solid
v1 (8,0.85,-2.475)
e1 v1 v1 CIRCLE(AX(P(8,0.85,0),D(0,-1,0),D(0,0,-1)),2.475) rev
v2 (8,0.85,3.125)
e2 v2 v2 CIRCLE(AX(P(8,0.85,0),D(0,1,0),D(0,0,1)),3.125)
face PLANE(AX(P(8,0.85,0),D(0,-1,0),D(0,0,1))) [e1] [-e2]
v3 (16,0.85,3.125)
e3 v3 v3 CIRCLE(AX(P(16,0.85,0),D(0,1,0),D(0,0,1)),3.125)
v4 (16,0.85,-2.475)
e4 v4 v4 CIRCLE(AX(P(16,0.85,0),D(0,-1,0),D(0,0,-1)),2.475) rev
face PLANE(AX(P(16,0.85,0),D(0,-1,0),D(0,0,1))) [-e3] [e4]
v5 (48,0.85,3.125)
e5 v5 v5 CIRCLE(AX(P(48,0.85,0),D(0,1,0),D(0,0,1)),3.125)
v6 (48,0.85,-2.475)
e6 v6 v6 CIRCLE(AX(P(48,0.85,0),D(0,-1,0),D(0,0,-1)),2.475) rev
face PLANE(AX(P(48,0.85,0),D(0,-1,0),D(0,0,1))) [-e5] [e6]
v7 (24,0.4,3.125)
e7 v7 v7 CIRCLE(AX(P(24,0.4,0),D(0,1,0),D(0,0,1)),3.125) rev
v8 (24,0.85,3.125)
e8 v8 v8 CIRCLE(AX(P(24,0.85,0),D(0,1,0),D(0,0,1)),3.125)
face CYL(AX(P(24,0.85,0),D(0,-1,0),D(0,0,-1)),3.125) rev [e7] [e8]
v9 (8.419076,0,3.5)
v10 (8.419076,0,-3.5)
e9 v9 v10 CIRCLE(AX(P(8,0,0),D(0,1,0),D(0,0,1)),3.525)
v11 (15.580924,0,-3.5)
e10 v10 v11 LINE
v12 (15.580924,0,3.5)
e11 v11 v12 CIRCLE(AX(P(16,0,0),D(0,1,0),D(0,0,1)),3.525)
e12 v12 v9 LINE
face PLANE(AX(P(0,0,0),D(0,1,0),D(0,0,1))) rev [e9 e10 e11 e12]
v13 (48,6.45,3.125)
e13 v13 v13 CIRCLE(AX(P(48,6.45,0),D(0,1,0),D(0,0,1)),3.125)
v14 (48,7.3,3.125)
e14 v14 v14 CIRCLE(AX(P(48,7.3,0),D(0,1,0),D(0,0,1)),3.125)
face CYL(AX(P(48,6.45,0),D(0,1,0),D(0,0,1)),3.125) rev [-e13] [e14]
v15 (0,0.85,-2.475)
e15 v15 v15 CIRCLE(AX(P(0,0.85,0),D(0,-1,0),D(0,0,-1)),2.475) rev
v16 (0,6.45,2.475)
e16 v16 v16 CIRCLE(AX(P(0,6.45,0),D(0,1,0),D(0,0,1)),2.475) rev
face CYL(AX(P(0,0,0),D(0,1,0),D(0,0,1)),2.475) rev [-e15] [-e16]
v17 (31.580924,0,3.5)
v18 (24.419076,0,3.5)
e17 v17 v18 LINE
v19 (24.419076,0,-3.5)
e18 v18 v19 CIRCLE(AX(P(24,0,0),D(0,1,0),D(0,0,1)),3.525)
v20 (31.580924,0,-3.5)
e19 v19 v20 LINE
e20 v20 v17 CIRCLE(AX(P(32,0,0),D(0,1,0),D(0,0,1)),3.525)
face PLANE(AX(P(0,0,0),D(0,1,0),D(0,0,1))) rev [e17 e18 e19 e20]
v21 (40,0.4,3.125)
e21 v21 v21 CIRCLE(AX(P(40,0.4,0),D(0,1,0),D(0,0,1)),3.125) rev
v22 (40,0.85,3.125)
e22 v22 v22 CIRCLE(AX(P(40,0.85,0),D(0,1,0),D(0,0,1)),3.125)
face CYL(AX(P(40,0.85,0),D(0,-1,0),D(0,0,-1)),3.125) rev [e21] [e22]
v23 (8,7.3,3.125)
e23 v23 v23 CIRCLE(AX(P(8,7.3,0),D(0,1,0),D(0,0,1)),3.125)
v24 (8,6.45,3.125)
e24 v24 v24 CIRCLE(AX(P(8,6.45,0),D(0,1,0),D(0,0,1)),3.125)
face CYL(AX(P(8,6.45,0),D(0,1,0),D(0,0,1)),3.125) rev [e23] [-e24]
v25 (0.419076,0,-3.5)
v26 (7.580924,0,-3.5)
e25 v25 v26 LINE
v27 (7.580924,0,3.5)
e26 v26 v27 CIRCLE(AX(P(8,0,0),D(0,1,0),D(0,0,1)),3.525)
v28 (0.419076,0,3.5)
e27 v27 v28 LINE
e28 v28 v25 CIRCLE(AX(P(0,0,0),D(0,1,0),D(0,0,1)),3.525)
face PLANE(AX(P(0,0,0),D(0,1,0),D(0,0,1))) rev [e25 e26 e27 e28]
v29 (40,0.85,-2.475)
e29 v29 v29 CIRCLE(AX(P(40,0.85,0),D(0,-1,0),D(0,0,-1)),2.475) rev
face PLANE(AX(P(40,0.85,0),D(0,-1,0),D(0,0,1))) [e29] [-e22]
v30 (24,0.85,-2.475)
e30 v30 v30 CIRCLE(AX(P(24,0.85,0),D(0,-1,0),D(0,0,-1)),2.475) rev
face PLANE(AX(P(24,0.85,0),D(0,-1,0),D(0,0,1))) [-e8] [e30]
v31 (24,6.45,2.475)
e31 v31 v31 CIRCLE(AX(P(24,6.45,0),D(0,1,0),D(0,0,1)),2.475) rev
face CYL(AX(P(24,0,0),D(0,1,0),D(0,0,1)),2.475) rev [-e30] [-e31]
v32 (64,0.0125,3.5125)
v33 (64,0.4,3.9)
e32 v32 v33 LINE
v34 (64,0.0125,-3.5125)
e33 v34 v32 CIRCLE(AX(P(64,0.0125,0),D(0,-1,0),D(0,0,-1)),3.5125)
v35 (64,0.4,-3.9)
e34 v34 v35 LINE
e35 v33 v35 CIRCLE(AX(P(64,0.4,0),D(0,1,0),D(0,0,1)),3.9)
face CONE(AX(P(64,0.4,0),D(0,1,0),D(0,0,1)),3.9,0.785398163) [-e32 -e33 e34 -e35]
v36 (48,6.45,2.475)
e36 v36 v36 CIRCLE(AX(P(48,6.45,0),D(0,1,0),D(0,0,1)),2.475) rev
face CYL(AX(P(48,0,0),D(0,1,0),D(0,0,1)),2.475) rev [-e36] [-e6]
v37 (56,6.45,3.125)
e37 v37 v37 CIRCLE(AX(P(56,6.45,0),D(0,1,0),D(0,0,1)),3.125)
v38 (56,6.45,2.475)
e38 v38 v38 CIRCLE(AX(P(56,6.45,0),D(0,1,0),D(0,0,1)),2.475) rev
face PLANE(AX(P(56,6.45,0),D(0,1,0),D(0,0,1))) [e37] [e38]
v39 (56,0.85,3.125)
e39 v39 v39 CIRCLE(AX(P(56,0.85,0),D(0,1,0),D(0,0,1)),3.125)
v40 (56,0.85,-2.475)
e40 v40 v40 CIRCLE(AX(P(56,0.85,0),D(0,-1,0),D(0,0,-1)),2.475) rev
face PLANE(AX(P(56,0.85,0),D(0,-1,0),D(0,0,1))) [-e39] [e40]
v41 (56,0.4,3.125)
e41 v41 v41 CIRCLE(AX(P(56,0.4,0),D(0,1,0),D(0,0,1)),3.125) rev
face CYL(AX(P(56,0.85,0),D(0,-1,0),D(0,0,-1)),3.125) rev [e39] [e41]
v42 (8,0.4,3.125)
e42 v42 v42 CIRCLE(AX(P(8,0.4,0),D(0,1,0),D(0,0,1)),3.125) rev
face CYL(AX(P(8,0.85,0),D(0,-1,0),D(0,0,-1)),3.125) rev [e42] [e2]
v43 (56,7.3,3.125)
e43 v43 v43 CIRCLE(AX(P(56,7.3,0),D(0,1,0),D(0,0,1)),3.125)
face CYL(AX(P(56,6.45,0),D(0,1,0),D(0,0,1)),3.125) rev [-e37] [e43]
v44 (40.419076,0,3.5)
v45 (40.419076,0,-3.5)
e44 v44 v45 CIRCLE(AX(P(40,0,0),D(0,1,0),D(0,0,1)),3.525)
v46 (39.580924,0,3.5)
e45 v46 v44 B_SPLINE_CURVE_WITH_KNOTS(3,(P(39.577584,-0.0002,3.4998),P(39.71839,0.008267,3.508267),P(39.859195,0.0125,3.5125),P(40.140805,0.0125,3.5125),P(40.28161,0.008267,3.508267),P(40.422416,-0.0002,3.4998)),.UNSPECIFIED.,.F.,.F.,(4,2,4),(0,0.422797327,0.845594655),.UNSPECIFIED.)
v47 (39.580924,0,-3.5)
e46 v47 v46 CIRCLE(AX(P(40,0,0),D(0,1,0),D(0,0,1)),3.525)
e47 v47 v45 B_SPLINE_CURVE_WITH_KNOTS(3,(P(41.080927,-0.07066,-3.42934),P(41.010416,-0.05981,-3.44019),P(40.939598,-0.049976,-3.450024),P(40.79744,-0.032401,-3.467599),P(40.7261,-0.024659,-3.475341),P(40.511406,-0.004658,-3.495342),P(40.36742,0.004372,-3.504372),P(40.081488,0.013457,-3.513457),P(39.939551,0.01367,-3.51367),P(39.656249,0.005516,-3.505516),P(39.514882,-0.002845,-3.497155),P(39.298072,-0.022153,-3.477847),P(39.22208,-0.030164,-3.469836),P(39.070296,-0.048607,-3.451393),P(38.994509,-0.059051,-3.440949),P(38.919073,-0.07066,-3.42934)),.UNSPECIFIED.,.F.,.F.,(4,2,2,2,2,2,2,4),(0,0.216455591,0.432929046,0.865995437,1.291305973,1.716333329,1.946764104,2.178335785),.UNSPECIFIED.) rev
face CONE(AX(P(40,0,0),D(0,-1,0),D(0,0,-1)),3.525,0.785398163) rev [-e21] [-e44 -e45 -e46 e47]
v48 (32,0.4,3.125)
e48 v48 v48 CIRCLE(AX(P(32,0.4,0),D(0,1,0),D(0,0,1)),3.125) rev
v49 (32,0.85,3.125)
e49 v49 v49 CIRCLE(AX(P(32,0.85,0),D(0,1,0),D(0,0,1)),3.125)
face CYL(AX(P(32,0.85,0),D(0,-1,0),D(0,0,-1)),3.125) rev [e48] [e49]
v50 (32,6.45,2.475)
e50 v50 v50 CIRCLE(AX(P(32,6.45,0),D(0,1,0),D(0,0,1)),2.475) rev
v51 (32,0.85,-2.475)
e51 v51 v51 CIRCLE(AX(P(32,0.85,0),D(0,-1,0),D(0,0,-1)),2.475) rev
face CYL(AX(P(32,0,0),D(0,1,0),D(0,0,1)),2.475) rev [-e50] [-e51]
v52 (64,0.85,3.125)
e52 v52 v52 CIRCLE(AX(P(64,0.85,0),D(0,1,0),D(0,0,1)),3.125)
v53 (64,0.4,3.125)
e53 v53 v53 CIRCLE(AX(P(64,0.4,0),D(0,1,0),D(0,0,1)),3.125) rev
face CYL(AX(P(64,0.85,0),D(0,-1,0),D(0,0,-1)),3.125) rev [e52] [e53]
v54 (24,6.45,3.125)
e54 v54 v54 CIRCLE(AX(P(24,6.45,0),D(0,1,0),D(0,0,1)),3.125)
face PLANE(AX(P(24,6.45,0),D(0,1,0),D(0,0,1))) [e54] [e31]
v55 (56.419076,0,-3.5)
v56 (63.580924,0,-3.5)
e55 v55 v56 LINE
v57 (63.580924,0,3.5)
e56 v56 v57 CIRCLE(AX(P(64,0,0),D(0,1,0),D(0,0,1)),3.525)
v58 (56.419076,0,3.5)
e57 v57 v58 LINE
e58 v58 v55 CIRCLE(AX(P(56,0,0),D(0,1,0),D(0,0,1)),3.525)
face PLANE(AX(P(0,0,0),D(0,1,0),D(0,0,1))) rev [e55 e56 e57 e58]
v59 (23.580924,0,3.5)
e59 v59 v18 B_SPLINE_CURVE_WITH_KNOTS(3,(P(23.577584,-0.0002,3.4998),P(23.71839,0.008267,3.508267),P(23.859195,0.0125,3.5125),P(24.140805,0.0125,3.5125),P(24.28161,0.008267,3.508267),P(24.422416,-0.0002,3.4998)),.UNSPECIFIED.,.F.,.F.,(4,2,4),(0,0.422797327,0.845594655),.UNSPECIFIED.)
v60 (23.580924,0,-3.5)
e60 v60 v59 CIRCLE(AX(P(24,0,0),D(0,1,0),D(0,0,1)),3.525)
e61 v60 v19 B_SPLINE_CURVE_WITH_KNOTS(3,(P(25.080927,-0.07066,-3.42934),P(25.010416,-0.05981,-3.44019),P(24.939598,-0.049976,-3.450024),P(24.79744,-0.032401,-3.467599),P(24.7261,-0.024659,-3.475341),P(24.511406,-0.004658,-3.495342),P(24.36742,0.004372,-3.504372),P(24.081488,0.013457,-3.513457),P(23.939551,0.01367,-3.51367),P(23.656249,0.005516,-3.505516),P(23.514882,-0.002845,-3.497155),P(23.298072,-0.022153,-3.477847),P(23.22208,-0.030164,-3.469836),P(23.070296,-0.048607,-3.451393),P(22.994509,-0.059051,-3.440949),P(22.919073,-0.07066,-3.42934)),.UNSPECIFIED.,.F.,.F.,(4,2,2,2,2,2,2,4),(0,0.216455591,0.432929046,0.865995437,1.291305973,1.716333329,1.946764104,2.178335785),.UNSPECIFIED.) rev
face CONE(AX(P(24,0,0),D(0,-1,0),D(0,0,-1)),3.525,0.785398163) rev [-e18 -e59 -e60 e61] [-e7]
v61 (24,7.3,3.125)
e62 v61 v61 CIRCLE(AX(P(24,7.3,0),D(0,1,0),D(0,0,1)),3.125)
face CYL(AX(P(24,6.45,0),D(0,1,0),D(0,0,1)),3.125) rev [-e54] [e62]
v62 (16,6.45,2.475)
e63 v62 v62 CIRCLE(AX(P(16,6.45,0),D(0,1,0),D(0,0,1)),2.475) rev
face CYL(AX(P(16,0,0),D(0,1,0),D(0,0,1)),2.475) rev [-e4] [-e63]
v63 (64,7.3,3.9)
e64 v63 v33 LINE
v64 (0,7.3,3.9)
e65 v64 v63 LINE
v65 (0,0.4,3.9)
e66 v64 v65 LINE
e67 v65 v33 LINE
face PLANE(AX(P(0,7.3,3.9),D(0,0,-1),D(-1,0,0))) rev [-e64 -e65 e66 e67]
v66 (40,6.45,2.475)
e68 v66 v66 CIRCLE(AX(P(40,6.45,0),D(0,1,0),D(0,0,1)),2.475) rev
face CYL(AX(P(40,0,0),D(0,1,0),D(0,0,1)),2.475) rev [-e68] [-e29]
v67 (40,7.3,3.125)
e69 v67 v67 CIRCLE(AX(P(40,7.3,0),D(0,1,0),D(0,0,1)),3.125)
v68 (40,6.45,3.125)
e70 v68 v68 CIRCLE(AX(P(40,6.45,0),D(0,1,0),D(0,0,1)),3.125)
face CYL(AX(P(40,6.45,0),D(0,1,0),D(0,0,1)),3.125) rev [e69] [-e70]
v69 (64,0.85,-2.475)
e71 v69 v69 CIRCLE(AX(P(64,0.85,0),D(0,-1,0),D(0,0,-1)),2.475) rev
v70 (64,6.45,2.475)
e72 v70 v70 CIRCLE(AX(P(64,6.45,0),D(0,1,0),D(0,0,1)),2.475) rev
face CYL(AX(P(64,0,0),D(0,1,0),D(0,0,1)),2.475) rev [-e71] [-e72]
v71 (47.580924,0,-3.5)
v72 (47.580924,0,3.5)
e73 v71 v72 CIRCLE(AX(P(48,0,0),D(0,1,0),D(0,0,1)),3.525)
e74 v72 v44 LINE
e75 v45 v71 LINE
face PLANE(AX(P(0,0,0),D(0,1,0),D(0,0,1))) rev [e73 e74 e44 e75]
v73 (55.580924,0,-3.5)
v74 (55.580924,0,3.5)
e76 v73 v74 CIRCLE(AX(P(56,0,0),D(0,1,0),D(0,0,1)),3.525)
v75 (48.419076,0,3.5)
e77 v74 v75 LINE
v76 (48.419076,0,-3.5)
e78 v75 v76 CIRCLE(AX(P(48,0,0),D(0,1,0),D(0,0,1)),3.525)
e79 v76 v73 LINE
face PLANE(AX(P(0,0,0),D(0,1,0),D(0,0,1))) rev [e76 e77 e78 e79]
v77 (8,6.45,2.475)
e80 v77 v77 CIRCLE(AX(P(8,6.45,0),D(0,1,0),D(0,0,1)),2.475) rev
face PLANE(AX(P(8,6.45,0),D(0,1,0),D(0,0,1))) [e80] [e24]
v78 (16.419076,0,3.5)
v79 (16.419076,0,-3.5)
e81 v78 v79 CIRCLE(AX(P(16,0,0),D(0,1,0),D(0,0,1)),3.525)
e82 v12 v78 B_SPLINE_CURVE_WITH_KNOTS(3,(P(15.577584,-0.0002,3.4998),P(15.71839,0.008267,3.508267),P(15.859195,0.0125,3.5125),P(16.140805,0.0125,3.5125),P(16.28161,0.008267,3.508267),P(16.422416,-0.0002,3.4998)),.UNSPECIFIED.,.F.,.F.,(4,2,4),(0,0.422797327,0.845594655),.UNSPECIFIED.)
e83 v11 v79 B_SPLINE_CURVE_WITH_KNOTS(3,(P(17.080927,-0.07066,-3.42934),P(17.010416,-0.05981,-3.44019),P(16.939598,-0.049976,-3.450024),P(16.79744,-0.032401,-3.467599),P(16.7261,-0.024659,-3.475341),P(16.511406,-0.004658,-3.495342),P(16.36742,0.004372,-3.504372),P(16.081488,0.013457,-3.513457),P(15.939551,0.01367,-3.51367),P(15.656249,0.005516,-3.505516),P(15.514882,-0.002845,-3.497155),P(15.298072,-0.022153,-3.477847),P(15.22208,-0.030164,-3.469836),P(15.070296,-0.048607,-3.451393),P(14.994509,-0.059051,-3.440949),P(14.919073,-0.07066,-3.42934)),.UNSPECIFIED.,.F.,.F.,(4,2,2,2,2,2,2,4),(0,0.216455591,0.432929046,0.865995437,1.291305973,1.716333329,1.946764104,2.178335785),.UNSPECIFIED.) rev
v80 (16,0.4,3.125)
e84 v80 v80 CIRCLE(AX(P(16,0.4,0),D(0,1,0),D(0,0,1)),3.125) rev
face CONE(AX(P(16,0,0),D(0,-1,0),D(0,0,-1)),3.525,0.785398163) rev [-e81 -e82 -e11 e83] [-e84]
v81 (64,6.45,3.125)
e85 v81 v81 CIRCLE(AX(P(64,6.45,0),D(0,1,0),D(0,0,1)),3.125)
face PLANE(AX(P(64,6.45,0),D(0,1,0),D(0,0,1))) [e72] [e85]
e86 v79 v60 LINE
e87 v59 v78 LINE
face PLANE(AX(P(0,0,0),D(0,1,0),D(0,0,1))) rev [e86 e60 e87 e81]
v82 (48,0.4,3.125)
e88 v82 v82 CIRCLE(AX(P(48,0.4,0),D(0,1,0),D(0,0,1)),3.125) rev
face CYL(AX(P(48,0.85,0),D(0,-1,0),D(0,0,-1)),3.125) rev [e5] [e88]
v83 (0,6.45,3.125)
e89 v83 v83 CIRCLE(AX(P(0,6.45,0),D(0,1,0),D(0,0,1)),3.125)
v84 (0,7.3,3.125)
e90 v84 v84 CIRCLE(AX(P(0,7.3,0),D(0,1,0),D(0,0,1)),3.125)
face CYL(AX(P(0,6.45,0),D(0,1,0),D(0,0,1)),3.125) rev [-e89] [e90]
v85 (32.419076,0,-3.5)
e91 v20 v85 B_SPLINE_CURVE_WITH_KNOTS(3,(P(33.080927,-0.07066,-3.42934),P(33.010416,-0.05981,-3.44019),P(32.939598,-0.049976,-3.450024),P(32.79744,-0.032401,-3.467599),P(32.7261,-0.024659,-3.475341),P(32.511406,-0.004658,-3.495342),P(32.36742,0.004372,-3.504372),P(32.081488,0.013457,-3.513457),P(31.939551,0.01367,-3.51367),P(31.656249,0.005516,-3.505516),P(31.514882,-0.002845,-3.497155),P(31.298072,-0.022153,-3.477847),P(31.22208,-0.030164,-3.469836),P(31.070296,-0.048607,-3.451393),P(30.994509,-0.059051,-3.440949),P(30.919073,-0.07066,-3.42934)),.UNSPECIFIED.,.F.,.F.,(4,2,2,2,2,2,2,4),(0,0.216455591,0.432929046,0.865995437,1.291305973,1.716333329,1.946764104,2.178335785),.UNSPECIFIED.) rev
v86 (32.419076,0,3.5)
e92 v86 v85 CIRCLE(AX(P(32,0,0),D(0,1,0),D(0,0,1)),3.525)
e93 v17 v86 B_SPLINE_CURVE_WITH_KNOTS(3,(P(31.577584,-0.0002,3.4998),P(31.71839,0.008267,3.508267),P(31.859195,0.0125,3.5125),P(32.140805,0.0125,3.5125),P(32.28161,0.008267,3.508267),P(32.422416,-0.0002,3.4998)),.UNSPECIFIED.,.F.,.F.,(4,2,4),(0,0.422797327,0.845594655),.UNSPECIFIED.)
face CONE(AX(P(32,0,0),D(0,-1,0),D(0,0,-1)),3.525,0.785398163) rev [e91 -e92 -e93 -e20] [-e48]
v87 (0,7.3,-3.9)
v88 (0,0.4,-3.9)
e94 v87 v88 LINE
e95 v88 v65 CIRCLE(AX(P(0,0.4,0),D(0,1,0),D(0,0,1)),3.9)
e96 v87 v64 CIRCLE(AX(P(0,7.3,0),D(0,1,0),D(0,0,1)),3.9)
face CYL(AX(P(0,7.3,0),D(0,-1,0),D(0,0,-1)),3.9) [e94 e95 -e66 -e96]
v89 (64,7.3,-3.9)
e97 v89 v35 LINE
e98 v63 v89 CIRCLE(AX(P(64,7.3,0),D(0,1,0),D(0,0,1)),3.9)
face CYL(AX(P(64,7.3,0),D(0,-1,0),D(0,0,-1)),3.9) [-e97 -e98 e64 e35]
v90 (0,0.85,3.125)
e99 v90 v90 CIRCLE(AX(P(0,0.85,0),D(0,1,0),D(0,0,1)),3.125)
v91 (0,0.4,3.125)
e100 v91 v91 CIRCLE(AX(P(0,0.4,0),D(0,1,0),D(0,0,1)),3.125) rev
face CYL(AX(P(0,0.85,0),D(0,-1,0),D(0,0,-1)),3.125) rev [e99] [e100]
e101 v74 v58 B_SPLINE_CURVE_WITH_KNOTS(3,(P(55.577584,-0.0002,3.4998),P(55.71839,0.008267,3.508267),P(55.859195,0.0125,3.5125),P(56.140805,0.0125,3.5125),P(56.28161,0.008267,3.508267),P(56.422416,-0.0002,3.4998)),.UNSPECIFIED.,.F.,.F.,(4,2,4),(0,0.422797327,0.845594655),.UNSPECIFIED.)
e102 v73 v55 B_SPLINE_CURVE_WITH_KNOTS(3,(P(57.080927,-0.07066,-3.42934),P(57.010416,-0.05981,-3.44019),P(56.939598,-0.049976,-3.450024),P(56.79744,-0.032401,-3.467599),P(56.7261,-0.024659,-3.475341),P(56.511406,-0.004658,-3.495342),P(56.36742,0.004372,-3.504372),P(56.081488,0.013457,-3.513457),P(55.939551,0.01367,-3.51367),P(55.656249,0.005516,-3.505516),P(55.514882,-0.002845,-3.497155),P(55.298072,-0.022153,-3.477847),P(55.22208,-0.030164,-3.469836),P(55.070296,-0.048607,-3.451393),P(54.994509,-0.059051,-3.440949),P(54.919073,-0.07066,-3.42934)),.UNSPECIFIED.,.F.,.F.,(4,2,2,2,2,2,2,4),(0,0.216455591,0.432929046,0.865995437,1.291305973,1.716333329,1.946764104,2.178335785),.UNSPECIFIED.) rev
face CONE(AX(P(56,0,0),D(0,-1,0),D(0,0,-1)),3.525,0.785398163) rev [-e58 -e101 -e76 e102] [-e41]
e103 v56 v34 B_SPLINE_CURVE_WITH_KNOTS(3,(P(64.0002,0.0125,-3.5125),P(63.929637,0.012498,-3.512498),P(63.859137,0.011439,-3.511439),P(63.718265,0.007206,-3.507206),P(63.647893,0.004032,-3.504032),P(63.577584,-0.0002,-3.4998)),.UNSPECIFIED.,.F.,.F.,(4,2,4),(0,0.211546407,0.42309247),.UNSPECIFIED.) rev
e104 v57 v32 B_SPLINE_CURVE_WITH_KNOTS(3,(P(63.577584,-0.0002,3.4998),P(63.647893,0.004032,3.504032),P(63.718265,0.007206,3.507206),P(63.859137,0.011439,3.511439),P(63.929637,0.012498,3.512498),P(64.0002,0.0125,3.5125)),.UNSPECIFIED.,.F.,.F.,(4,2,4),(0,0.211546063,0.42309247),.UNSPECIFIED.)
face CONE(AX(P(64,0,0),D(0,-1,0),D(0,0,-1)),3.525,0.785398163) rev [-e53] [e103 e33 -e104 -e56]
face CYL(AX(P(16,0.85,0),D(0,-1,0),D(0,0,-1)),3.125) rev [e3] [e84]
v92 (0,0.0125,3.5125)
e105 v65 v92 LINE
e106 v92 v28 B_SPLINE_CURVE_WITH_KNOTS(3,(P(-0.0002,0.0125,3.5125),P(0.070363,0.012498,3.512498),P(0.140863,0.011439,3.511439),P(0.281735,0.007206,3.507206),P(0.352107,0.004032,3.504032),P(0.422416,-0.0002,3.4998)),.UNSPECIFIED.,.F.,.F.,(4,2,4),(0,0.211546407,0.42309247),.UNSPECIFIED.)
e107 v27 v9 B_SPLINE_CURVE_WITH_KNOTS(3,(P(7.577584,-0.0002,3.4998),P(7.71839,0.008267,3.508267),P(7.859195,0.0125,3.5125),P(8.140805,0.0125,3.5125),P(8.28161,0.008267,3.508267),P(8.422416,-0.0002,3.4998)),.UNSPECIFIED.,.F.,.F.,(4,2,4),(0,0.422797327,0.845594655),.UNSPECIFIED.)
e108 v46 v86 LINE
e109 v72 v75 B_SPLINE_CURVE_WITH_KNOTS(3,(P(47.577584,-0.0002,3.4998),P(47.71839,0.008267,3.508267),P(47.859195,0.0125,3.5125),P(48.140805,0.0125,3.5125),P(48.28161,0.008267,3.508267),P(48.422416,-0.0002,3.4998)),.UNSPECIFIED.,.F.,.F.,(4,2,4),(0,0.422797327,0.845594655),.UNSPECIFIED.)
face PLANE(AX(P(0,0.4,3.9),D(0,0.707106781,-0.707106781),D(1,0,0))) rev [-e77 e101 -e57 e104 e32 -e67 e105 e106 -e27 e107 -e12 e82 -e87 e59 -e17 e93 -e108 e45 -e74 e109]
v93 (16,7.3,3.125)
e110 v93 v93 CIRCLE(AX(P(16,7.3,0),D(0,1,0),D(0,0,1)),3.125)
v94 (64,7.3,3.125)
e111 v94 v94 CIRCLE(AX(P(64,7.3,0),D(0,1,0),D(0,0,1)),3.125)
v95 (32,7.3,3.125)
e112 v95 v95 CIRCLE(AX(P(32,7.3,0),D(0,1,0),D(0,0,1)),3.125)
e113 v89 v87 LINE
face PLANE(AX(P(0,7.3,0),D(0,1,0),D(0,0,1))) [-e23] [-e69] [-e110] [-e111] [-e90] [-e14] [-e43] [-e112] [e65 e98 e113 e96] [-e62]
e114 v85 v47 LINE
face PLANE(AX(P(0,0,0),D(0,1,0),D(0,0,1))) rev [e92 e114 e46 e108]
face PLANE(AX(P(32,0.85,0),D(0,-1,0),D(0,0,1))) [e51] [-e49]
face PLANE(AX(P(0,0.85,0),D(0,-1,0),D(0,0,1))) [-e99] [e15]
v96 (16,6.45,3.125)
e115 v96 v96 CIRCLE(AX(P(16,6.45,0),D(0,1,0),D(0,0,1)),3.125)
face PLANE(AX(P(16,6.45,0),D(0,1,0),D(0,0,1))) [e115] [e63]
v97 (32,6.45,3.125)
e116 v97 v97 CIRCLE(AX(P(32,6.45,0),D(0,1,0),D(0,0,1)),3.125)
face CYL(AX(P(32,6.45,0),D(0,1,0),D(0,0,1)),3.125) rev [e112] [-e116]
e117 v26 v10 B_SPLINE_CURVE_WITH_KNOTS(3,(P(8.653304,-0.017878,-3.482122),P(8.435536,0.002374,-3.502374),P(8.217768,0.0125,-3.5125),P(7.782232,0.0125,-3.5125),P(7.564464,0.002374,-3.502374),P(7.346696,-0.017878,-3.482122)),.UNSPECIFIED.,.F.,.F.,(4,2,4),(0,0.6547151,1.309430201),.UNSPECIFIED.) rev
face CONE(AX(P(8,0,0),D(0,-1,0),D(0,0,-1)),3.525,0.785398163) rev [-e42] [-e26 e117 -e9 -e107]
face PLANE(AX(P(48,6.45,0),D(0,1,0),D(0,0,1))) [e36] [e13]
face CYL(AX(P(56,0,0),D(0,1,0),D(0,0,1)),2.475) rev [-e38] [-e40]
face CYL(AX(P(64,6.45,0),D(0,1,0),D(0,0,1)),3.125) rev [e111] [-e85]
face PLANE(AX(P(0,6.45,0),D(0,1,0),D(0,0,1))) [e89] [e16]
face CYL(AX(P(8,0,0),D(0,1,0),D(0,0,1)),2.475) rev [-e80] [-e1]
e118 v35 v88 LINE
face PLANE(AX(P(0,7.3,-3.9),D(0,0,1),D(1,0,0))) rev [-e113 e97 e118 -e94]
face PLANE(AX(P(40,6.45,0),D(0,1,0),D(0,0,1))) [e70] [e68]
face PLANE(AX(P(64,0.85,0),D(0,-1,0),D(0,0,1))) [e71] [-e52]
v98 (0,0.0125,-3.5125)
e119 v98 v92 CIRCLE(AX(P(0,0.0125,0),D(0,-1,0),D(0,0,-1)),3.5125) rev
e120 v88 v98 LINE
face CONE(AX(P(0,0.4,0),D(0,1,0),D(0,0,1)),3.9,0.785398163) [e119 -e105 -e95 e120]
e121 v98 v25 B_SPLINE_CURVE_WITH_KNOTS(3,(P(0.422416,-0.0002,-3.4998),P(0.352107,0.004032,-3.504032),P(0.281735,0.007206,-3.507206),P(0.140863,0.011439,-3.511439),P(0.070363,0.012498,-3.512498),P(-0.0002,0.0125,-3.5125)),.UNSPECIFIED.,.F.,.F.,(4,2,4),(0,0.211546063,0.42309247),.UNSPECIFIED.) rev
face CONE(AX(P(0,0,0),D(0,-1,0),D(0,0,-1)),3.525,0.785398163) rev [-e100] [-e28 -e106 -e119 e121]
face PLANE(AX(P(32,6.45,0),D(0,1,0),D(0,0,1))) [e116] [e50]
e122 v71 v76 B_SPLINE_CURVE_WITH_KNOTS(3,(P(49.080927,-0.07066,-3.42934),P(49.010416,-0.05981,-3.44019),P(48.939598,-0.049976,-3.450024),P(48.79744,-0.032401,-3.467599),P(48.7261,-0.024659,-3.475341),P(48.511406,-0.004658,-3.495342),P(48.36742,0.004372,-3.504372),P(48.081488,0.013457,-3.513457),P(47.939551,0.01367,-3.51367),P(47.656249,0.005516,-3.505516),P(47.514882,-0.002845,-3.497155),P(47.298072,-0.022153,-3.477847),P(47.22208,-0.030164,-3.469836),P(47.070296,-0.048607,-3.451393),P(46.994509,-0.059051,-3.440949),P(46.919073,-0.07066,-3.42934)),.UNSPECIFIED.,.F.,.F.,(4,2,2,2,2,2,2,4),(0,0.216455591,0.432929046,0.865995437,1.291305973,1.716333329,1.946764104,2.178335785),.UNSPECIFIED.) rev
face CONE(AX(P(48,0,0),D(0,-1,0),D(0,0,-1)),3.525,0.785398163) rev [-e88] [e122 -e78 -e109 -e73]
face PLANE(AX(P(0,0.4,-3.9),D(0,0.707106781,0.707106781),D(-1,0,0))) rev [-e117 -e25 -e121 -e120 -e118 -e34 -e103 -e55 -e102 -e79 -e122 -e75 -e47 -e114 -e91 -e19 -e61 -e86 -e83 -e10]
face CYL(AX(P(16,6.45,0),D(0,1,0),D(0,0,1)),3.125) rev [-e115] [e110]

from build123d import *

# Parameters (mm, degrees)
BOSS_EXTRUDE1_DEPTH       = 7.3
SKETCH2_R                 = 2.475
CUT_EXTRUDE1_DEPTH        = 69.402558432
SKETCH3_R                 = 3.125
CUT_EXTRUDE2_DEPTH        = 0.85
LPATTERN1_COUNT           = 9
LPATTERN1_PITCH           = 8
LPATTERN1_COPY_1_SKETCH_R = 3.125
LPATTERN1_COPY_1_DEPTH    = 0.85
LPATTERN1_COPY_2_SKETCH_R = 3.125
LPATTERN1_COPY_2_DEPTH    = 0.85
LPATTERN1_COPY_3_SKETCH_R = 3.125
LPATTERN1_COPY_3_DEPTH    = 0.85
LPATTERN1_COPY_4_SKETCH_R = 3.125
LPATTERN1_COPY_4_DEPTH    = 0.85
LPATTERN1_COPY_5_SKETCH_R = 3.125
LPATTERN1_COPY_5_DEPTH    = 0.85
LPATTERN1_COPY_6_SKETCH_R = 3.125
LPATTERN1_COPY_6_DEPTH    = 0.85
LPATTERN1_COPY_7_SKETCH_R = 3.125
LPATTERN1_COPY_7_DEPTH    = 0.85
LPATTERN1_COPY_8_SKETCH_R = 3.125
LPATTERN1_COPY_8_DEPTH    = 0.85
CHAMFER1_SIZE             = 0.4


with BuildPart() as part:
    # Sketch1 → Boss-Extrude1 (new body)
    with BuildSketch(Plane(origin=(0, 0, 0), x_dir=(1, 0, 0), z_dir=(0, 1, 0))):
        with BuildLine():
            Line((0, 3.9), (64, 3.9))
            ThreePointArc((64, 3.9), (67.9, 0), (64, -3.9))
            Line((64, -3.9), (0, -3.9))
            ThreePointArc((0, -3.9), (-3.9, 0), (0, 3.9))
        make_face()
    extrude(amount=BOSS_EXTRUDE1_DEPTH)

    # Sketch2 → Cut-Extrude1 (cut, through all)
    with BuildSketch(Plane(origin=(0, 7.3, 0), x_dir=(1, 0, 0), z_dir=(0, 1, 0))):
        with Locations(Location((0, 0, 0), (0, 0, 270))):
            Circle(SKETCH2_R)
    cut_extrude1 = extrude(amount=-CUT_EXTRUDE1_DEPTH, mode=Mode.SUBTRACT)

    # Sketch3 → Cut-Extrude2 (cut)
    with BuildSketch(Plane(origin=(0, 7.3, 0), x_dir=(1, 0, 0), z_dir=(0, 1, 0))):
        with Locations(Location((0, 0, 0), (0, 0, 270))):
            Circle(SKETCH3_R)
    cut_extrude2 = extrude(amount=-CUT_EXTRUDE2_DEPTH, mode=Mode.SUBTRACT)

    # Mirror1: Cut-Extrude2 across plane
    add(cut_extrude2.mirror(Plane.ZX.offset(3.65)), mode=Mode.SUBTRACT)

    # LPattern1: Cut-Extrude1, Cut-Extrude2 ×9
    with Locations(*[(i * LPATTERN1_PITCH, 0, 0) for i in range(1, LPATTERN1_COUNT)]):
        add(cut_extrude1, mode=Mode.SUBTRACT)
        add(cut_extrude2, mode=Mode.SUBTRACT)

    # LPattern1 copy 1 sketch → LPattern1 copy 1 (cut)
    with BuildSketch(Plane(origin=(8, 0, 0), x_dir=(1, 0, 0), z_dir=(0, -1, 0))):
        Circle(LPATTERN1_COPY_1_SKETCH_R)
    extrude(amount=-LPATTERN1_COPY_1_DEPTH, mode=Mode.SUBTRACT)

    # LPattern1 copy 2 sketch → LPattern1 copy 2 (cut)
    with BuildSketch(Plane(origin=(16, 0, 0), x_dir=(1, 0, 0), z_dir=(0, -1, 0))):
        Circle(LPATTERN1_COPY_2_SKETCH_R)
    extrude(amount=-LPATTERN1_COPY_2_DEPTH, mode=Mode.SUBTRACT)

    # LPattern1 copy 3 sketch → LPattern1 copy 3 (cut)
    with BuildSketch(Plane(origin=(24, 0, 0), x_dir=(1, 0, 0), z_dir=(0, -1, 0))):
        Circle(LPATTERN1_COPY_3_SKETCH_R)
    extrude(amount=-LPATTERN1_COPY_3_DEPTH, mode=Mode.SUBTRACT)

    # LPattern1 copy 4 sketch → LPattern1 copy 4 (cut)
    with BuildSketch(Plane(origin=(32, 0, 0), x_dir=(1, 0, 0), z_dir=(0, -1, 0))):
        Circle(LPATTERN1_COPY_4_SKETCH_R)
    extrude(amount=-LPATTERN1_COPY_4_DEPTH, mode=Mode.SUBTRACT)

    # LPattern1 copy 5 sketch → LPattern1 copy 5 (cut)
    with BuildSketch(Plane(origin=(40, 0, 0), x_dir=(1, 0, 0), z_dir=(0, -1, 0))):
        Circle(LPATTERN1_COPY_5_SKETCH_R)
    extrude(amount=-LPATTERN1_COPY_5_DEPTH, mode=Mode.SUBTRACT)

    # LPattern1 copy 6 sketch → LPattern1 copy 6 (cut)
    with BuildSketch(Plane(origin=(48, 0, 0), x_dir=(1, 0, 0), z_dir=(0, -1, 0))):
        Circle(LPATTERN1_COPY_6_SKETCH_R)
    extrude(amount=-LPATTERN1_COPY_6_DEPTH, mode=Mode.SUBTRACT)

    # LPattern1 copy 7 sketch → LPattern1 copy 7 (cut)
    with BuildSketch(Plane(origin=(56, 0, 0), x_dir=(1, 0, 0), z_dir=(0, -1, 0))):
        Circle(LPATTERN1_COPY_7_SKETCH_R)
    extrude(amount=-LPATTERN1_COPY_7_DEPTH, mode=Mode.SUBTRACT)

    # LPattern1 copy 8 sketch → LPattern1 copy 8 (cut)
    with BuildSketch(Plane(origin=(64, 0, 0), x_dir=(1, 0, 0), z_dir=(0, -1, 0))):
        Circle(LPATTERN1_COPY_8_SKETCH_R)
    extrude(amount=-LPATTERN1_COPY_8_DEPTH, mode=Mode.SUBTRACT)

    # Chamfer1
    # the kernel refuses this chamfer: 0.4 mm, written as the material it takes off along each edge
    with BuildSketch(Plane(origin=(8, 0, 0), x_dir=(1, 0, 0), z_dir=(0, 0, -1))) as chamfer1_piece_1:
        Polygon((3.125 + CHAMFER1_SIZE, 0), (3.125, -CHAMFER1_SIZE), (3.125, 0), align=None)
    revolve(axis=Axis((8, 0, 0), (0, -1, 0)), mode=Mode.SUBTRACT)
    with BuildSketch(Plane(origin=(16, 0, 0), x_dir=(1, 0, 0), z_dir=(0, 0, -1))) as chamfer1_piece_2:
        Polygon((3.125 + CHAMFER1_SIZE, 0), (3.125, -CHAMFER1_SIZE), (3.125, 0), align=None)
    revolve(axis=Axis((16, 0, 0), (0, -1, 0)), mode=Mode.SUBTRACT)
    with BuildSketch(Plane(origin=(24, 0, 0), x_dir=(1, 0, 0), z_dir=(0, 0, -1))) as chamfer1_piece_3:
        Polygon((3.125 + CHAMFER1_SIZE, 0), (3.125, -CHAMFER1_SIZE), (3.125, 0), align=None)
    revolve(axis=Axis((24, 0, 0), (0, -1, 0)), mode=Mode.SUBTRACT)
    with BuildSketch(Plane(origin=(32, 0, 0), x_dir=(1, 0, 0), z_dir=(0, 0, -1))) as chamfer1_piece_4:
        Polygon((3.125 + CHAMFER1_SIZE, 0), (3.125, -CHAMFER1_SIZE), (3.125, 0), align=None)
    revolve(axis=Axis((32, 0, 0), (0, -1, 0)), mode=Mode.SUBTRACT)
    with BuildSketch(Plane(origin=(40, 0, 0), x_dir=(1, 0, 0), z_dir=(0, 0, -1))) as chamfer1_piece_5:
        Polygon((3.125 + CHAMFER1_SIZE, 0), (3.125, -CHAMFER1_SIZE), (3.125, 0), align=None)
    revolve(axis=Axis((40, 0, 0), (0, -1, 0)), mode=Mode.SUBTRACT)
    with BuildSketch(Plane(origin=(48, 0, 0), x_dir=(1, 0, 0), z_dir=(0, 0, -1))) as chamfer1_piece_6:
        Polygon((3.125 + CHAMFER1_SIZE, 0), (3.125, -CHAMFER1_SIZE), (3.125, 0), align=None)
    revolve(axis=Axis((48, 0, 0), (0, -1, 0)), mode=Mode.SUBTRACT)
    with BuildSketch(Plane(origin=(56, 0, 0), x_dir=(1, 0, 0), z_dir=(0, 0, -1))) as chamfer1_piece_7:
        Polygon((3.125 + CHAMFER1_SIZE, 0), (3.125, -CHAMFER1_SIZE), (3.125, 0), align=None)
    revolve(axis=Axis((56, 0, 0), (0, -1, 0)), mode=Mode.SUBTRACT)
    with BuildSketch(Plane(origin=(64, 0, 0), x_dir=(1, 0, 0), z_dir=(0, 0, -1))) as chamfer1_piece_8:
        Polygon((3.125 + CHAMFER1_SIZE, 0), (3.125, -CHAMFER1_SIZE), (3.125, 0), align=None)
    revolve(axis=Axis((64, 0, 0), (0, -1, 0)), mode=Mode.SUBTRACT)
    with BuildSketch(Plane(origin=(0, 0, 0), x_dir=(0, 0, 1), z_dir=(-1, 0, 0))) as chamfer1_piece_9:
        Polygon((3.125 + CHAMFER1_SIZE, 0), (3.125, CHAMFER1_SIZE), (3.125, 0), align=None)
    revolve(axis=Axis((0, 0, 0), (0, 1, 0)), mode=Mode.SUBTRACT)
    with BuildSketch(Plane(origin=(0, 0, -3.9), x_dir=(0, -0.027495876610586386, 0.9996219169112968), z_dir=(1, 0, 0))) as chamfer1_piece_10:
        Polygon((CHAMFER1_SIZE * 0.999621916911, -CHAMFER1_SIZE * 0.0274958766106), (-CHAMFER1_SIZE * 0.0274958766106, -CHAMFER1_SIZE * 0.999621916911), (0, 0), align=None)
    extrude(amount=64, mode=Mode.SUBTRACT)
    with BuildSketch(Plane(origin=(64, 0, 0), x_dir=(0, 0, -1), z_dir=(-1, 0, 0))) as chamfer1_piece_11:
        Polygon((3.9, -CHAMFER1_SIZE), (3.9 - CHAMFER1_SIZE, 0), (3.9, 0), align=None)
    revolve(axis=Axis((64, 0, 0), (0, -1, 0)), revolution_arc=180, mode=Mode.SUBTRACT)
    with BuildSketch(Plane(origin=(64, 0, 3.9), x_dir=(0, 0.9996219169112968, 0.027495876610586275), z_dir=(-1, 0, 0))) as chamfer1_piece_12:
        Polygon((CHAMFER1_SIZE * 0.999621916911, CHAMFER1_SIZE * 0.0274958766106), (-CHAMFER1_SIZE * 0.0274958766106, CHAMFER1_SIZE * 0.999621916911), (0, 0), align=None)
    extrude(amount=64, mode=Mode.SUBTRACT)
    with BuildSketch(Plane(origin=(0, 0, 0), x_dir=(0, 0, 1), z_dir=(1, 0, 0))) as chamfer1_piece_13:
        Polygon((3.9, -CHAMFER1_SIZE), (3.9 - CHAMFER1_SIZE, 0), (3.9, 0), align=None)
    revolve(axis=Axis((0, 0, 0), (0, -1, 0)), revolution_arc=180, mode=Mode.SUBTRACT)


solid = part.part
